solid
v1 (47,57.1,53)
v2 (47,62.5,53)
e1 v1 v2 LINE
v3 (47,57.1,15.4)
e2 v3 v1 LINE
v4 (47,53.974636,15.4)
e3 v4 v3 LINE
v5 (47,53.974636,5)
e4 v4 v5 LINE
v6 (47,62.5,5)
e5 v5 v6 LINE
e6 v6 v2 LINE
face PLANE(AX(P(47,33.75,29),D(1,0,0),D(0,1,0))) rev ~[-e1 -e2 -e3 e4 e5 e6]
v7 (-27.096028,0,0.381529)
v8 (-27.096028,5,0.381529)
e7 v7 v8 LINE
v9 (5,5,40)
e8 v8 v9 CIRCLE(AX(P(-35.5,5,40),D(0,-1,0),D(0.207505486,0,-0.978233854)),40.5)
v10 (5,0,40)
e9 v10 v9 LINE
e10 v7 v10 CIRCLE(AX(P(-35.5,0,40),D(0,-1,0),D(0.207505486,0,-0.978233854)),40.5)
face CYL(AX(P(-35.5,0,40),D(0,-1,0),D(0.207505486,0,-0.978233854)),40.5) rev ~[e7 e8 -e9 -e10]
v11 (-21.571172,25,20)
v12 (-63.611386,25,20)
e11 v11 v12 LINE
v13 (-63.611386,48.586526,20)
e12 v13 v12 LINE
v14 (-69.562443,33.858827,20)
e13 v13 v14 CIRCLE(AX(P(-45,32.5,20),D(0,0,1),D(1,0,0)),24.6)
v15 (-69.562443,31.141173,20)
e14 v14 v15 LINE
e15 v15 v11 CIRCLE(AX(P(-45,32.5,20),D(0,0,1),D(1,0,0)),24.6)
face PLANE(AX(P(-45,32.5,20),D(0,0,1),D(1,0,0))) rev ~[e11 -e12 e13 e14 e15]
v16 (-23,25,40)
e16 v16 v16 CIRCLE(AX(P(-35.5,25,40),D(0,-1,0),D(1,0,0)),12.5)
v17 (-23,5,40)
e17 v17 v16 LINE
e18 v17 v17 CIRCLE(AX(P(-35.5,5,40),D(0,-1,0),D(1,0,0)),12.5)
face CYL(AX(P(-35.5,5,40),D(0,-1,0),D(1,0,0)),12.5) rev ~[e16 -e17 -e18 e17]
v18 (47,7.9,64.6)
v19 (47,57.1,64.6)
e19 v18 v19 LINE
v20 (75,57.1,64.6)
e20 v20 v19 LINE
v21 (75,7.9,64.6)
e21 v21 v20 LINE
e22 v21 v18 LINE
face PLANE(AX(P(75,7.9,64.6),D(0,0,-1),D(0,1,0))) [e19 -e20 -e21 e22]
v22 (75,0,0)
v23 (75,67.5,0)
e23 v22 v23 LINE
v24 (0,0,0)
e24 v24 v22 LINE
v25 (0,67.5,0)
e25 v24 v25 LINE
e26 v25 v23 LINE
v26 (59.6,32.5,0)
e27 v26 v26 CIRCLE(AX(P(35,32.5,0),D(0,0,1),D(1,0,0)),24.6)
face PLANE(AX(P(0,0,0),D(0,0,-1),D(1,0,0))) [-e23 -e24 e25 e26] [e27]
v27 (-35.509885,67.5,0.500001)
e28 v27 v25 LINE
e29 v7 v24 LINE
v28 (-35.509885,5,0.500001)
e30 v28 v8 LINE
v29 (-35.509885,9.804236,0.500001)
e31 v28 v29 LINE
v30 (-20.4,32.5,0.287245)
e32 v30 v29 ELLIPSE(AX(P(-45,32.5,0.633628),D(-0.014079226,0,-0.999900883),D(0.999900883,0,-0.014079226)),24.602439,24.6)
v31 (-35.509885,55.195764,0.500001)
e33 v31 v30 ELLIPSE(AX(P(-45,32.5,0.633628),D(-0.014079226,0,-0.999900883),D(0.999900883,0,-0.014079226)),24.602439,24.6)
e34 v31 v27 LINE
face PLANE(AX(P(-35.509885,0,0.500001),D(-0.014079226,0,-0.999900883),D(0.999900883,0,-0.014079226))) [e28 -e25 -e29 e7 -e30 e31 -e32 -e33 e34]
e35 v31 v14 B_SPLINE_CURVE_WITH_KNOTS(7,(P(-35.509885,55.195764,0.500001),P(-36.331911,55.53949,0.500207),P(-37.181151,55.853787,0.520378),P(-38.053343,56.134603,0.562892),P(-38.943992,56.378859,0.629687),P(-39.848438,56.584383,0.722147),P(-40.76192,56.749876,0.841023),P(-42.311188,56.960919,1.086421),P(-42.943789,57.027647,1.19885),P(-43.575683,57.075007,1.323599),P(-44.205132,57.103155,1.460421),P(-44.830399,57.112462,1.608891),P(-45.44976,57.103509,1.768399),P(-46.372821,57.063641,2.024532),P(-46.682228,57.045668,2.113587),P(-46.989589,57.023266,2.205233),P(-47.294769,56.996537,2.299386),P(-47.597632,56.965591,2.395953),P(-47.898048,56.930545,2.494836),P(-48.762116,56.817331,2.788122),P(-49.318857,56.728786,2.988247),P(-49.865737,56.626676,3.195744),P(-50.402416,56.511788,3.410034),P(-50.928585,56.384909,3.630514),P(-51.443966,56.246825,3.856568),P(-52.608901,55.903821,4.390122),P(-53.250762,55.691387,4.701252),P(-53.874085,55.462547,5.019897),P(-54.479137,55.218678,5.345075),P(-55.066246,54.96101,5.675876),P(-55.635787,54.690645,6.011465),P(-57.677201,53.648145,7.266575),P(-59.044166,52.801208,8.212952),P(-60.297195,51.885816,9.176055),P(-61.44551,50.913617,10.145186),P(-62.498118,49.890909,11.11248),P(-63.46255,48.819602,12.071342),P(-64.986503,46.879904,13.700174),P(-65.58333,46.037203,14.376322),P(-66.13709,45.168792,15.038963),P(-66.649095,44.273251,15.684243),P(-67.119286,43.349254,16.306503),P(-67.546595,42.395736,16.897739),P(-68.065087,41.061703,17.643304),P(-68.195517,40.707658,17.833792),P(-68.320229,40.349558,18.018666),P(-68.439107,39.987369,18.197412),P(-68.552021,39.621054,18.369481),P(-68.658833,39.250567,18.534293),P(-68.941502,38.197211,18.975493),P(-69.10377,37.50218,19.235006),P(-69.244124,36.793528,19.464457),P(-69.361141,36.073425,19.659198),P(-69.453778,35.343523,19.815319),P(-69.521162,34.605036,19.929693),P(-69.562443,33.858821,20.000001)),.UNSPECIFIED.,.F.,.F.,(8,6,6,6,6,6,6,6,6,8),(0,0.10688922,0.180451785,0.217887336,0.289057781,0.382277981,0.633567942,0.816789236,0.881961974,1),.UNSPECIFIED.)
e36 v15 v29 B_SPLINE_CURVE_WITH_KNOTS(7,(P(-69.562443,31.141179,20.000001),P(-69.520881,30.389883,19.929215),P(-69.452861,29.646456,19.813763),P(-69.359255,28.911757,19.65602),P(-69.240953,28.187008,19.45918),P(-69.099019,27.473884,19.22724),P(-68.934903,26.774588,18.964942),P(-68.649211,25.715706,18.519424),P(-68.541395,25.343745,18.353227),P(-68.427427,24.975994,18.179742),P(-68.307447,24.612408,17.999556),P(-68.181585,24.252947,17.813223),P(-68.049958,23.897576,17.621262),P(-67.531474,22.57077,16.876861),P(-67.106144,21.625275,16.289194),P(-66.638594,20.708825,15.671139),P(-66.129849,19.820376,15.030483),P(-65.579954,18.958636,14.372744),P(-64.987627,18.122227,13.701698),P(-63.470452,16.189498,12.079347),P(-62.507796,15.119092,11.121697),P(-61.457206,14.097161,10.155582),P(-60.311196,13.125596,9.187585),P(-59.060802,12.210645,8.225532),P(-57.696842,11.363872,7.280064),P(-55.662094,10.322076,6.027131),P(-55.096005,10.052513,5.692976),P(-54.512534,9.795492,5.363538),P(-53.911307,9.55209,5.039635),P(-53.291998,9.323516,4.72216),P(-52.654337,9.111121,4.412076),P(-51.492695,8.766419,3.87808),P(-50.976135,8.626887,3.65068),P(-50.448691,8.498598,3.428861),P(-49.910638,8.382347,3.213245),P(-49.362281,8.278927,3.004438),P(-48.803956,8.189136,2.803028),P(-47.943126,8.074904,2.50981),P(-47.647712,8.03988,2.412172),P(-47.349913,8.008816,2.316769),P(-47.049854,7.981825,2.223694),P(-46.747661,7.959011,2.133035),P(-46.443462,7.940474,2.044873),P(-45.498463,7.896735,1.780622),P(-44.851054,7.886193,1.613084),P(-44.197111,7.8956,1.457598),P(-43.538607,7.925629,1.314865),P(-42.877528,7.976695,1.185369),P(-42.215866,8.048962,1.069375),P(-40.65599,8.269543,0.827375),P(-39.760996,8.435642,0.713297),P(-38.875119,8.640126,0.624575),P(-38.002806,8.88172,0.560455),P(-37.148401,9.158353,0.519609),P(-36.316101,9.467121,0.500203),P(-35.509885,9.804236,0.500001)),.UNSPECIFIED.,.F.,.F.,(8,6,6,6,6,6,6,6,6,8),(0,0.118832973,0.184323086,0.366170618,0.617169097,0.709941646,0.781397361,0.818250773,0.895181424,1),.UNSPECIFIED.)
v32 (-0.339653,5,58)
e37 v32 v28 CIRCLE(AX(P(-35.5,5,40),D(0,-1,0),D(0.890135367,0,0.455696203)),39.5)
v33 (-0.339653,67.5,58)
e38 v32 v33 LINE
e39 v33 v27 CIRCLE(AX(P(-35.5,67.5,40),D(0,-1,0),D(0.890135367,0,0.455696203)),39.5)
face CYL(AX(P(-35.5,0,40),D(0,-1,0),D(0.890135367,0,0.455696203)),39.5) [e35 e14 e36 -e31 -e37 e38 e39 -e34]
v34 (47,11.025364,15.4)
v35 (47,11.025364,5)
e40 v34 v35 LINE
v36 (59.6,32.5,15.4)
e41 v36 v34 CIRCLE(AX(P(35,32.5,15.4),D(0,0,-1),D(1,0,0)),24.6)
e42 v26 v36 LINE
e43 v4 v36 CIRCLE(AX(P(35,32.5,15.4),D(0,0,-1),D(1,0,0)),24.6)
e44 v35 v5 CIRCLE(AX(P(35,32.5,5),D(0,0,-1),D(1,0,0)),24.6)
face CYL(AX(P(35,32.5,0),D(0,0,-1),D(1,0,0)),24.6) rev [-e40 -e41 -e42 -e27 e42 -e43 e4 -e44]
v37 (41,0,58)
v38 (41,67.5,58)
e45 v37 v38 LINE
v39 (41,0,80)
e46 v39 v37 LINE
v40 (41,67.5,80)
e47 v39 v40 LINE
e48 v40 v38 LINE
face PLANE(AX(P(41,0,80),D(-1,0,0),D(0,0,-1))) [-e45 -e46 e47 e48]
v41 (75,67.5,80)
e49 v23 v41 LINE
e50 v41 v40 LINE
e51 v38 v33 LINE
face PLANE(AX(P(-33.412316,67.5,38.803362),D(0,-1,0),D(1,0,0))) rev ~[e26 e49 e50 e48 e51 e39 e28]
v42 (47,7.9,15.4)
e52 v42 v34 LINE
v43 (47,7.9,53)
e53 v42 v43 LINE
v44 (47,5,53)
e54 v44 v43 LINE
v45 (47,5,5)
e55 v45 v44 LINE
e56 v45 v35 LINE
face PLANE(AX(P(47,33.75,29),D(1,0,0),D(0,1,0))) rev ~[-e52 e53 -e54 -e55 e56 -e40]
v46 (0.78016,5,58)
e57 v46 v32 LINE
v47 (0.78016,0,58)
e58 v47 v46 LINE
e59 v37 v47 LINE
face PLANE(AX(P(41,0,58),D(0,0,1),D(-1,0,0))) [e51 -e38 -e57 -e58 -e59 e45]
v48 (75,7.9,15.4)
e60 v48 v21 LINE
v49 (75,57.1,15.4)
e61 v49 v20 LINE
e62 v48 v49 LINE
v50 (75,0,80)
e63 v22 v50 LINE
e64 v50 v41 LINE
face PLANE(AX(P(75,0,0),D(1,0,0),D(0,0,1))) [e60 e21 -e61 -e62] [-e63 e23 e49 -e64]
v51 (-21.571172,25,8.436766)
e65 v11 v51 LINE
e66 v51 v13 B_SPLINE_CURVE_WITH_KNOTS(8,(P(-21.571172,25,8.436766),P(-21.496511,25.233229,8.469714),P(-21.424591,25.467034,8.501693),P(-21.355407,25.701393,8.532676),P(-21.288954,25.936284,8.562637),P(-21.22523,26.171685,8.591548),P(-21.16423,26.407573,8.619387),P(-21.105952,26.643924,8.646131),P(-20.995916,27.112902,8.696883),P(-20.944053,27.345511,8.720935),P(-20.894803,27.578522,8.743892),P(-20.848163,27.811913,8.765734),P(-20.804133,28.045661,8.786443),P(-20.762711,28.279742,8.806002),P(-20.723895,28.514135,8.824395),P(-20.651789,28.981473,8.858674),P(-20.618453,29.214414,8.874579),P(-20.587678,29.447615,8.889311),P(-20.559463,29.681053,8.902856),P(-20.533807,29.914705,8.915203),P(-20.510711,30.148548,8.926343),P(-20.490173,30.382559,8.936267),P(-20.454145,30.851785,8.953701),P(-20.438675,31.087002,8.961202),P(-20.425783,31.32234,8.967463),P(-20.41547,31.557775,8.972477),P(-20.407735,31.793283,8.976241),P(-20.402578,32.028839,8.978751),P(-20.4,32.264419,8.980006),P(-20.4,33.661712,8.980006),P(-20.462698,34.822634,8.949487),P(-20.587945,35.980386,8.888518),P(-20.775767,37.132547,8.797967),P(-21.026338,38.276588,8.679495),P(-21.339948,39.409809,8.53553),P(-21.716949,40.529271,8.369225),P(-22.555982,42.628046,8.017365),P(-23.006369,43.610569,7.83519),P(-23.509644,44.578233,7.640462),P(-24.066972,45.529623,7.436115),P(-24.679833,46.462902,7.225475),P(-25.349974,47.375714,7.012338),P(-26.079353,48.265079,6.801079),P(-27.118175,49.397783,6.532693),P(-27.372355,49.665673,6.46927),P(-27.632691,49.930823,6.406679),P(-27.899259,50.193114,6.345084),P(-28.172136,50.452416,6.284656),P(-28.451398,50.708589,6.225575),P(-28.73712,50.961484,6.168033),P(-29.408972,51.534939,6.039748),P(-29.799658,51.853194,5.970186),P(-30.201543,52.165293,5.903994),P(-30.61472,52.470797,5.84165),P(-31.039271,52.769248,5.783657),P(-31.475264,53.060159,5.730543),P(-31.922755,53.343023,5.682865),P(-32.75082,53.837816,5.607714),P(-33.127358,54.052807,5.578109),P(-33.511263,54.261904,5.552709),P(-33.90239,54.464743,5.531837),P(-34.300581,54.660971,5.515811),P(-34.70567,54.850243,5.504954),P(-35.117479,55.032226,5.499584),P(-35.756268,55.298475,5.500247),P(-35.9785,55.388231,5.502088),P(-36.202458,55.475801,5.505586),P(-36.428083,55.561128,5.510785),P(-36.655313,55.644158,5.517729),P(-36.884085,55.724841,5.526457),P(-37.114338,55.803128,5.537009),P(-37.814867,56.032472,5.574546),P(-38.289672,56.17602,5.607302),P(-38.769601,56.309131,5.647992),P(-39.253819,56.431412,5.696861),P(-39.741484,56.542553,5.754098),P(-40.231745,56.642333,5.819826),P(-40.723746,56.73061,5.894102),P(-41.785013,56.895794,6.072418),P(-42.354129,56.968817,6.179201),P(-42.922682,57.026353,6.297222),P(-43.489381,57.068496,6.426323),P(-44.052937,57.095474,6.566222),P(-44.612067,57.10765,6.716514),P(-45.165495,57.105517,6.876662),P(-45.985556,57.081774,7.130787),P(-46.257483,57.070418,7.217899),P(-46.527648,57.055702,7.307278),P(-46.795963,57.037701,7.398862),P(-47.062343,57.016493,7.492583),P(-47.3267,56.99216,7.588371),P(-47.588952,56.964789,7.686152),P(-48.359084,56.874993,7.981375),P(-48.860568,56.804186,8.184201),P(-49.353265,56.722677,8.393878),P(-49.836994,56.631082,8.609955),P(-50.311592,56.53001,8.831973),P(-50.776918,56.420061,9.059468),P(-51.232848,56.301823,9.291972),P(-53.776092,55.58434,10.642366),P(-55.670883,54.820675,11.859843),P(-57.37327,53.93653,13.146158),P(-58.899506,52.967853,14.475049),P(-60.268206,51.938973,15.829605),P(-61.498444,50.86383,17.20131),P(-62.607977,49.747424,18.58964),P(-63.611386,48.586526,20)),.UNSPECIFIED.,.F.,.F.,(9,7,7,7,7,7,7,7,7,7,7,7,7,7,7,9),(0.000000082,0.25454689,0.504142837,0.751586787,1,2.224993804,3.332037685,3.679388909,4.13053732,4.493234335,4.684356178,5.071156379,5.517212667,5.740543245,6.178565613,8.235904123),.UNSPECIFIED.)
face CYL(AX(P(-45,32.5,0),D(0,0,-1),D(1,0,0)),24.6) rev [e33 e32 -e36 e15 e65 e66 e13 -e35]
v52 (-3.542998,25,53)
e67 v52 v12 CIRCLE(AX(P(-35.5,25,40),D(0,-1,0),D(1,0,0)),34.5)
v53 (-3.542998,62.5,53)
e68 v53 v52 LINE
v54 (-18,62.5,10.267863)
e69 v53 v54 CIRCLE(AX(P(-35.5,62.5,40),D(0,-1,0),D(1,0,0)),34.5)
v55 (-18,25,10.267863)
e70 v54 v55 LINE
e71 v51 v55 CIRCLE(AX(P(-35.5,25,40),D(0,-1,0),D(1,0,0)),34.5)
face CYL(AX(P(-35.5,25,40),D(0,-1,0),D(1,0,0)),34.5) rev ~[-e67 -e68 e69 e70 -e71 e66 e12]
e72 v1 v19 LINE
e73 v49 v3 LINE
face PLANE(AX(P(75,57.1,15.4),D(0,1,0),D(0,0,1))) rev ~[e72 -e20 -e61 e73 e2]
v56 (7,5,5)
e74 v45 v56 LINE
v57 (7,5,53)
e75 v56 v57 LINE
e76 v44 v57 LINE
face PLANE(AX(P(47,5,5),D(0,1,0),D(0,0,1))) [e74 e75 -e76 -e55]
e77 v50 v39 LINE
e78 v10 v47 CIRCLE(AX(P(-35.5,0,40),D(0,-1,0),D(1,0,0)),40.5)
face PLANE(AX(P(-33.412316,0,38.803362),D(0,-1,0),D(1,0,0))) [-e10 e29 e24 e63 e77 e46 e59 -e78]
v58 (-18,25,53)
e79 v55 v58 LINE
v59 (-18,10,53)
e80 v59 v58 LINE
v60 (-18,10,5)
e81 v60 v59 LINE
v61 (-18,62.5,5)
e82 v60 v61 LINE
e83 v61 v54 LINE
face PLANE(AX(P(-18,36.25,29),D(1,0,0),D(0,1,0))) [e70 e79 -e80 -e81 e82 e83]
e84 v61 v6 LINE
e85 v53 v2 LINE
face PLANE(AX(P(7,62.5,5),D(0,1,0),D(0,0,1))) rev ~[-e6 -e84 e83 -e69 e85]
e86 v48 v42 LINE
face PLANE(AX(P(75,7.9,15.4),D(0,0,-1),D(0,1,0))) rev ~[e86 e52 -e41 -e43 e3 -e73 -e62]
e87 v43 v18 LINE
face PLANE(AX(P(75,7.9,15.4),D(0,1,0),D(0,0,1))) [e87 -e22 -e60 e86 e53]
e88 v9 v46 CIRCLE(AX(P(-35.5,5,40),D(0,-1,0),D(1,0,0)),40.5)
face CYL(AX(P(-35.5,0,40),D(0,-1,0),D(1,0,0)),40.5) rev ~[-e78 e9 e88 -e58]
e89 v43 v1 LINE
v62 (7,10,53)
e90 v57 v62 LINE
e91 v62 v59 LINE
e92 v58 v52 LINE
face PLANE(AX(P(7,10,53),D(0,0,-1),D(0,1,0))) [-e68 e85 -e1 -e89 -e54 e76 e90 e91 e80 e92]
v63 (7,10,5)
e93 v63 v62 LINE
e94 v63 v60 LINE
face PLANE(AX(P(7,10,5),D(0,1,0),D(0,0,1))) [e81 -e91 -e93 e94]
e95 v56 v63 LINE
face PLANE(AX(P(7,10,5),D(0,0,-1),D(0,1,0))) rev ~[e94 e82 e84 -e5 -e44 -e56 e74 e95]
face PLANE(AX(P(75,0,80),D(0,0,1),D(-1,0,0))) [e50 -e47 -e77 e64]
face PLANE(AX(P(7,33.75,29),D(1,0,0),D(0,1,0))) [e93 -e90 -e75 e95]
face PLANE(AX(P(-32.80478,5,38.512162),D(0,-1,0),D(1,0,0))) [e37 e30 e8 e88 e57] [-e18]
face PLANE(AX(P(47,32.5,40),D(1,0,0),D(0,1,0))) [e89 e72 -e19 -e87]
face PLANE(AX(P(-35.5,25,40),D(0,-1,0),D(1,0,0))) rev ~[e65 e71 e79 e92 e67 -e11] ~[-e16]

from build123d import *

# Parameters (mm, degrees)
F1_DEPTH  = 67.5
F3_W      = 49.2
F3_H      = 49.2
F4_DEPTH  = 28
F6_W      = 57.5
F6_H      = 48
F7_DEPTH  = 40
F9_DEPTH  = 5
F10_R     = 12.5
F11_DEPTH = 20
F13_R     = 34.5
F14_DEPTH = 37.5
F16_W     = 52.5
F16_H     = 48
F17_DEPTH = 25
F18_R     = 24.6
F19_DEPTH = 20


with BuildPart() as f1:
    # F0 (on Front) → F1 (new body)
    with BuildSketch(Plane.XZ):
        with BuildLine():
            ThreePointArc((-35.5098846553, 0.5000012368), (-7.5727771152, 12.0657876083), (4, 40))
            ThreePointArc((4, 40), (2.8997637092, 49.2578694674), (-0.3396530165, 58))
            ThreePointArc((-0.3396530165, 58), (-69.1964570083, 60.6106473718), (-35.5098846553, 0.5000012368))
        make_face()
        with BuildLine():
            ThreePointArc((-0.3396530165, 58), (2.8997637092, 49.2578694674), (4, 40))
            ThreePointArc((4, 40), (-7.5727771152, 12.0657876083), (-35.5098846553, 0.5000012368))
            Line((-35.5098846553, 0.5000012368), (0, 0))
            Line((0, 0), (75, 0))
            Line((75, 0), (75, 80))
            Line((75, 80), (41, 80))
            Line((41, 80), (41, 58))
            Line((41, 58), (-0.3396530165, 58))
        make_face()
    extrude(amount=-F1_DEPTH)

    # F3 (on offset) → F4 (cut)
    with BuildSketch(Plane.YZ.offset(75)):
        with Locations((32.5, 40)):
            Rectangle(F3_W, F3_H)
    extrude(amount=-F4_DEPTH, mode=Mode.SUBTRACT)

    # F6 (on offset) → F7 (cut)
    with BuildSketch(Plane.YZ.offset(47)):
        with Locations((33.75, 29)):
            Rectangle(F6_W, F6_H)
    extrude(amount=-F7_DEPTH, mode=Mode.SUBTRACT)

    # F8 (on face) → F9 (cut)
    with BuildSketch(Plane.XZ):
        with BuildLine():
            ThreePointArc((-27.0960278356, 0.3815289056), (-4.0308812273, 14.5059896511), (5, 40))
            ThreePointArc((5, 40), (3.9309299575, 49.2440122613), (0.7801598673, 58))
            Line((0.7801598673, 58), (-0.3396530165, 58))
            ThreePointArc((-0.3396530165, 58), (-69.1964570083, 60.6106473718), (-35.5098846553, 0.5000012368))
            Line((-35.5098846553, 0.5000012368), (-27.0960278356, 0.3815289056))
        make_face()
    extrude(amount=-F9_DEPTH, mode=Mode.SUBTRACT)

    # F10 (on face) → F11 (cut)
    with BuildSketch(Plane.XZ.offset(-5)):
        with Locations((-35.5, 40)):
            Circle(F10_R)
    extrude(amount=-F11_DEPTH, mode=Mode.SUBTRACT)

    # F13 (on offset) → F14 (cut)
    with BuildSketch(Plane.XZ.offset(-25)):
        with Locations((-35.5, 40)):
            Circle(F13_R)
    extrude(amount=-F14_DEPTH, mode=Mode.SUBTRACT)

    # F16 (on offset) → F17 (cut)
    with BuildSketch(Plane.YZ.offset(7)):
        with Locations((36.25, 29)):
            Rectangle(F16_W, F16_H)
    extrude(amount=-F17_DEPTH, mode=Mode.SUBTRACT)

    # F18 (on Top) → F19 (cut)
    with BuildSketch(Plane.XY):
        with Locations((-45, 32.5)):
            Circle(F18_R)
        with Locations((35, 32.5)):
            Circle(F18_R)
    extrude(amount=F19_DEPTH, mode=Mode.SUBTRACT)


solid = f1.part
